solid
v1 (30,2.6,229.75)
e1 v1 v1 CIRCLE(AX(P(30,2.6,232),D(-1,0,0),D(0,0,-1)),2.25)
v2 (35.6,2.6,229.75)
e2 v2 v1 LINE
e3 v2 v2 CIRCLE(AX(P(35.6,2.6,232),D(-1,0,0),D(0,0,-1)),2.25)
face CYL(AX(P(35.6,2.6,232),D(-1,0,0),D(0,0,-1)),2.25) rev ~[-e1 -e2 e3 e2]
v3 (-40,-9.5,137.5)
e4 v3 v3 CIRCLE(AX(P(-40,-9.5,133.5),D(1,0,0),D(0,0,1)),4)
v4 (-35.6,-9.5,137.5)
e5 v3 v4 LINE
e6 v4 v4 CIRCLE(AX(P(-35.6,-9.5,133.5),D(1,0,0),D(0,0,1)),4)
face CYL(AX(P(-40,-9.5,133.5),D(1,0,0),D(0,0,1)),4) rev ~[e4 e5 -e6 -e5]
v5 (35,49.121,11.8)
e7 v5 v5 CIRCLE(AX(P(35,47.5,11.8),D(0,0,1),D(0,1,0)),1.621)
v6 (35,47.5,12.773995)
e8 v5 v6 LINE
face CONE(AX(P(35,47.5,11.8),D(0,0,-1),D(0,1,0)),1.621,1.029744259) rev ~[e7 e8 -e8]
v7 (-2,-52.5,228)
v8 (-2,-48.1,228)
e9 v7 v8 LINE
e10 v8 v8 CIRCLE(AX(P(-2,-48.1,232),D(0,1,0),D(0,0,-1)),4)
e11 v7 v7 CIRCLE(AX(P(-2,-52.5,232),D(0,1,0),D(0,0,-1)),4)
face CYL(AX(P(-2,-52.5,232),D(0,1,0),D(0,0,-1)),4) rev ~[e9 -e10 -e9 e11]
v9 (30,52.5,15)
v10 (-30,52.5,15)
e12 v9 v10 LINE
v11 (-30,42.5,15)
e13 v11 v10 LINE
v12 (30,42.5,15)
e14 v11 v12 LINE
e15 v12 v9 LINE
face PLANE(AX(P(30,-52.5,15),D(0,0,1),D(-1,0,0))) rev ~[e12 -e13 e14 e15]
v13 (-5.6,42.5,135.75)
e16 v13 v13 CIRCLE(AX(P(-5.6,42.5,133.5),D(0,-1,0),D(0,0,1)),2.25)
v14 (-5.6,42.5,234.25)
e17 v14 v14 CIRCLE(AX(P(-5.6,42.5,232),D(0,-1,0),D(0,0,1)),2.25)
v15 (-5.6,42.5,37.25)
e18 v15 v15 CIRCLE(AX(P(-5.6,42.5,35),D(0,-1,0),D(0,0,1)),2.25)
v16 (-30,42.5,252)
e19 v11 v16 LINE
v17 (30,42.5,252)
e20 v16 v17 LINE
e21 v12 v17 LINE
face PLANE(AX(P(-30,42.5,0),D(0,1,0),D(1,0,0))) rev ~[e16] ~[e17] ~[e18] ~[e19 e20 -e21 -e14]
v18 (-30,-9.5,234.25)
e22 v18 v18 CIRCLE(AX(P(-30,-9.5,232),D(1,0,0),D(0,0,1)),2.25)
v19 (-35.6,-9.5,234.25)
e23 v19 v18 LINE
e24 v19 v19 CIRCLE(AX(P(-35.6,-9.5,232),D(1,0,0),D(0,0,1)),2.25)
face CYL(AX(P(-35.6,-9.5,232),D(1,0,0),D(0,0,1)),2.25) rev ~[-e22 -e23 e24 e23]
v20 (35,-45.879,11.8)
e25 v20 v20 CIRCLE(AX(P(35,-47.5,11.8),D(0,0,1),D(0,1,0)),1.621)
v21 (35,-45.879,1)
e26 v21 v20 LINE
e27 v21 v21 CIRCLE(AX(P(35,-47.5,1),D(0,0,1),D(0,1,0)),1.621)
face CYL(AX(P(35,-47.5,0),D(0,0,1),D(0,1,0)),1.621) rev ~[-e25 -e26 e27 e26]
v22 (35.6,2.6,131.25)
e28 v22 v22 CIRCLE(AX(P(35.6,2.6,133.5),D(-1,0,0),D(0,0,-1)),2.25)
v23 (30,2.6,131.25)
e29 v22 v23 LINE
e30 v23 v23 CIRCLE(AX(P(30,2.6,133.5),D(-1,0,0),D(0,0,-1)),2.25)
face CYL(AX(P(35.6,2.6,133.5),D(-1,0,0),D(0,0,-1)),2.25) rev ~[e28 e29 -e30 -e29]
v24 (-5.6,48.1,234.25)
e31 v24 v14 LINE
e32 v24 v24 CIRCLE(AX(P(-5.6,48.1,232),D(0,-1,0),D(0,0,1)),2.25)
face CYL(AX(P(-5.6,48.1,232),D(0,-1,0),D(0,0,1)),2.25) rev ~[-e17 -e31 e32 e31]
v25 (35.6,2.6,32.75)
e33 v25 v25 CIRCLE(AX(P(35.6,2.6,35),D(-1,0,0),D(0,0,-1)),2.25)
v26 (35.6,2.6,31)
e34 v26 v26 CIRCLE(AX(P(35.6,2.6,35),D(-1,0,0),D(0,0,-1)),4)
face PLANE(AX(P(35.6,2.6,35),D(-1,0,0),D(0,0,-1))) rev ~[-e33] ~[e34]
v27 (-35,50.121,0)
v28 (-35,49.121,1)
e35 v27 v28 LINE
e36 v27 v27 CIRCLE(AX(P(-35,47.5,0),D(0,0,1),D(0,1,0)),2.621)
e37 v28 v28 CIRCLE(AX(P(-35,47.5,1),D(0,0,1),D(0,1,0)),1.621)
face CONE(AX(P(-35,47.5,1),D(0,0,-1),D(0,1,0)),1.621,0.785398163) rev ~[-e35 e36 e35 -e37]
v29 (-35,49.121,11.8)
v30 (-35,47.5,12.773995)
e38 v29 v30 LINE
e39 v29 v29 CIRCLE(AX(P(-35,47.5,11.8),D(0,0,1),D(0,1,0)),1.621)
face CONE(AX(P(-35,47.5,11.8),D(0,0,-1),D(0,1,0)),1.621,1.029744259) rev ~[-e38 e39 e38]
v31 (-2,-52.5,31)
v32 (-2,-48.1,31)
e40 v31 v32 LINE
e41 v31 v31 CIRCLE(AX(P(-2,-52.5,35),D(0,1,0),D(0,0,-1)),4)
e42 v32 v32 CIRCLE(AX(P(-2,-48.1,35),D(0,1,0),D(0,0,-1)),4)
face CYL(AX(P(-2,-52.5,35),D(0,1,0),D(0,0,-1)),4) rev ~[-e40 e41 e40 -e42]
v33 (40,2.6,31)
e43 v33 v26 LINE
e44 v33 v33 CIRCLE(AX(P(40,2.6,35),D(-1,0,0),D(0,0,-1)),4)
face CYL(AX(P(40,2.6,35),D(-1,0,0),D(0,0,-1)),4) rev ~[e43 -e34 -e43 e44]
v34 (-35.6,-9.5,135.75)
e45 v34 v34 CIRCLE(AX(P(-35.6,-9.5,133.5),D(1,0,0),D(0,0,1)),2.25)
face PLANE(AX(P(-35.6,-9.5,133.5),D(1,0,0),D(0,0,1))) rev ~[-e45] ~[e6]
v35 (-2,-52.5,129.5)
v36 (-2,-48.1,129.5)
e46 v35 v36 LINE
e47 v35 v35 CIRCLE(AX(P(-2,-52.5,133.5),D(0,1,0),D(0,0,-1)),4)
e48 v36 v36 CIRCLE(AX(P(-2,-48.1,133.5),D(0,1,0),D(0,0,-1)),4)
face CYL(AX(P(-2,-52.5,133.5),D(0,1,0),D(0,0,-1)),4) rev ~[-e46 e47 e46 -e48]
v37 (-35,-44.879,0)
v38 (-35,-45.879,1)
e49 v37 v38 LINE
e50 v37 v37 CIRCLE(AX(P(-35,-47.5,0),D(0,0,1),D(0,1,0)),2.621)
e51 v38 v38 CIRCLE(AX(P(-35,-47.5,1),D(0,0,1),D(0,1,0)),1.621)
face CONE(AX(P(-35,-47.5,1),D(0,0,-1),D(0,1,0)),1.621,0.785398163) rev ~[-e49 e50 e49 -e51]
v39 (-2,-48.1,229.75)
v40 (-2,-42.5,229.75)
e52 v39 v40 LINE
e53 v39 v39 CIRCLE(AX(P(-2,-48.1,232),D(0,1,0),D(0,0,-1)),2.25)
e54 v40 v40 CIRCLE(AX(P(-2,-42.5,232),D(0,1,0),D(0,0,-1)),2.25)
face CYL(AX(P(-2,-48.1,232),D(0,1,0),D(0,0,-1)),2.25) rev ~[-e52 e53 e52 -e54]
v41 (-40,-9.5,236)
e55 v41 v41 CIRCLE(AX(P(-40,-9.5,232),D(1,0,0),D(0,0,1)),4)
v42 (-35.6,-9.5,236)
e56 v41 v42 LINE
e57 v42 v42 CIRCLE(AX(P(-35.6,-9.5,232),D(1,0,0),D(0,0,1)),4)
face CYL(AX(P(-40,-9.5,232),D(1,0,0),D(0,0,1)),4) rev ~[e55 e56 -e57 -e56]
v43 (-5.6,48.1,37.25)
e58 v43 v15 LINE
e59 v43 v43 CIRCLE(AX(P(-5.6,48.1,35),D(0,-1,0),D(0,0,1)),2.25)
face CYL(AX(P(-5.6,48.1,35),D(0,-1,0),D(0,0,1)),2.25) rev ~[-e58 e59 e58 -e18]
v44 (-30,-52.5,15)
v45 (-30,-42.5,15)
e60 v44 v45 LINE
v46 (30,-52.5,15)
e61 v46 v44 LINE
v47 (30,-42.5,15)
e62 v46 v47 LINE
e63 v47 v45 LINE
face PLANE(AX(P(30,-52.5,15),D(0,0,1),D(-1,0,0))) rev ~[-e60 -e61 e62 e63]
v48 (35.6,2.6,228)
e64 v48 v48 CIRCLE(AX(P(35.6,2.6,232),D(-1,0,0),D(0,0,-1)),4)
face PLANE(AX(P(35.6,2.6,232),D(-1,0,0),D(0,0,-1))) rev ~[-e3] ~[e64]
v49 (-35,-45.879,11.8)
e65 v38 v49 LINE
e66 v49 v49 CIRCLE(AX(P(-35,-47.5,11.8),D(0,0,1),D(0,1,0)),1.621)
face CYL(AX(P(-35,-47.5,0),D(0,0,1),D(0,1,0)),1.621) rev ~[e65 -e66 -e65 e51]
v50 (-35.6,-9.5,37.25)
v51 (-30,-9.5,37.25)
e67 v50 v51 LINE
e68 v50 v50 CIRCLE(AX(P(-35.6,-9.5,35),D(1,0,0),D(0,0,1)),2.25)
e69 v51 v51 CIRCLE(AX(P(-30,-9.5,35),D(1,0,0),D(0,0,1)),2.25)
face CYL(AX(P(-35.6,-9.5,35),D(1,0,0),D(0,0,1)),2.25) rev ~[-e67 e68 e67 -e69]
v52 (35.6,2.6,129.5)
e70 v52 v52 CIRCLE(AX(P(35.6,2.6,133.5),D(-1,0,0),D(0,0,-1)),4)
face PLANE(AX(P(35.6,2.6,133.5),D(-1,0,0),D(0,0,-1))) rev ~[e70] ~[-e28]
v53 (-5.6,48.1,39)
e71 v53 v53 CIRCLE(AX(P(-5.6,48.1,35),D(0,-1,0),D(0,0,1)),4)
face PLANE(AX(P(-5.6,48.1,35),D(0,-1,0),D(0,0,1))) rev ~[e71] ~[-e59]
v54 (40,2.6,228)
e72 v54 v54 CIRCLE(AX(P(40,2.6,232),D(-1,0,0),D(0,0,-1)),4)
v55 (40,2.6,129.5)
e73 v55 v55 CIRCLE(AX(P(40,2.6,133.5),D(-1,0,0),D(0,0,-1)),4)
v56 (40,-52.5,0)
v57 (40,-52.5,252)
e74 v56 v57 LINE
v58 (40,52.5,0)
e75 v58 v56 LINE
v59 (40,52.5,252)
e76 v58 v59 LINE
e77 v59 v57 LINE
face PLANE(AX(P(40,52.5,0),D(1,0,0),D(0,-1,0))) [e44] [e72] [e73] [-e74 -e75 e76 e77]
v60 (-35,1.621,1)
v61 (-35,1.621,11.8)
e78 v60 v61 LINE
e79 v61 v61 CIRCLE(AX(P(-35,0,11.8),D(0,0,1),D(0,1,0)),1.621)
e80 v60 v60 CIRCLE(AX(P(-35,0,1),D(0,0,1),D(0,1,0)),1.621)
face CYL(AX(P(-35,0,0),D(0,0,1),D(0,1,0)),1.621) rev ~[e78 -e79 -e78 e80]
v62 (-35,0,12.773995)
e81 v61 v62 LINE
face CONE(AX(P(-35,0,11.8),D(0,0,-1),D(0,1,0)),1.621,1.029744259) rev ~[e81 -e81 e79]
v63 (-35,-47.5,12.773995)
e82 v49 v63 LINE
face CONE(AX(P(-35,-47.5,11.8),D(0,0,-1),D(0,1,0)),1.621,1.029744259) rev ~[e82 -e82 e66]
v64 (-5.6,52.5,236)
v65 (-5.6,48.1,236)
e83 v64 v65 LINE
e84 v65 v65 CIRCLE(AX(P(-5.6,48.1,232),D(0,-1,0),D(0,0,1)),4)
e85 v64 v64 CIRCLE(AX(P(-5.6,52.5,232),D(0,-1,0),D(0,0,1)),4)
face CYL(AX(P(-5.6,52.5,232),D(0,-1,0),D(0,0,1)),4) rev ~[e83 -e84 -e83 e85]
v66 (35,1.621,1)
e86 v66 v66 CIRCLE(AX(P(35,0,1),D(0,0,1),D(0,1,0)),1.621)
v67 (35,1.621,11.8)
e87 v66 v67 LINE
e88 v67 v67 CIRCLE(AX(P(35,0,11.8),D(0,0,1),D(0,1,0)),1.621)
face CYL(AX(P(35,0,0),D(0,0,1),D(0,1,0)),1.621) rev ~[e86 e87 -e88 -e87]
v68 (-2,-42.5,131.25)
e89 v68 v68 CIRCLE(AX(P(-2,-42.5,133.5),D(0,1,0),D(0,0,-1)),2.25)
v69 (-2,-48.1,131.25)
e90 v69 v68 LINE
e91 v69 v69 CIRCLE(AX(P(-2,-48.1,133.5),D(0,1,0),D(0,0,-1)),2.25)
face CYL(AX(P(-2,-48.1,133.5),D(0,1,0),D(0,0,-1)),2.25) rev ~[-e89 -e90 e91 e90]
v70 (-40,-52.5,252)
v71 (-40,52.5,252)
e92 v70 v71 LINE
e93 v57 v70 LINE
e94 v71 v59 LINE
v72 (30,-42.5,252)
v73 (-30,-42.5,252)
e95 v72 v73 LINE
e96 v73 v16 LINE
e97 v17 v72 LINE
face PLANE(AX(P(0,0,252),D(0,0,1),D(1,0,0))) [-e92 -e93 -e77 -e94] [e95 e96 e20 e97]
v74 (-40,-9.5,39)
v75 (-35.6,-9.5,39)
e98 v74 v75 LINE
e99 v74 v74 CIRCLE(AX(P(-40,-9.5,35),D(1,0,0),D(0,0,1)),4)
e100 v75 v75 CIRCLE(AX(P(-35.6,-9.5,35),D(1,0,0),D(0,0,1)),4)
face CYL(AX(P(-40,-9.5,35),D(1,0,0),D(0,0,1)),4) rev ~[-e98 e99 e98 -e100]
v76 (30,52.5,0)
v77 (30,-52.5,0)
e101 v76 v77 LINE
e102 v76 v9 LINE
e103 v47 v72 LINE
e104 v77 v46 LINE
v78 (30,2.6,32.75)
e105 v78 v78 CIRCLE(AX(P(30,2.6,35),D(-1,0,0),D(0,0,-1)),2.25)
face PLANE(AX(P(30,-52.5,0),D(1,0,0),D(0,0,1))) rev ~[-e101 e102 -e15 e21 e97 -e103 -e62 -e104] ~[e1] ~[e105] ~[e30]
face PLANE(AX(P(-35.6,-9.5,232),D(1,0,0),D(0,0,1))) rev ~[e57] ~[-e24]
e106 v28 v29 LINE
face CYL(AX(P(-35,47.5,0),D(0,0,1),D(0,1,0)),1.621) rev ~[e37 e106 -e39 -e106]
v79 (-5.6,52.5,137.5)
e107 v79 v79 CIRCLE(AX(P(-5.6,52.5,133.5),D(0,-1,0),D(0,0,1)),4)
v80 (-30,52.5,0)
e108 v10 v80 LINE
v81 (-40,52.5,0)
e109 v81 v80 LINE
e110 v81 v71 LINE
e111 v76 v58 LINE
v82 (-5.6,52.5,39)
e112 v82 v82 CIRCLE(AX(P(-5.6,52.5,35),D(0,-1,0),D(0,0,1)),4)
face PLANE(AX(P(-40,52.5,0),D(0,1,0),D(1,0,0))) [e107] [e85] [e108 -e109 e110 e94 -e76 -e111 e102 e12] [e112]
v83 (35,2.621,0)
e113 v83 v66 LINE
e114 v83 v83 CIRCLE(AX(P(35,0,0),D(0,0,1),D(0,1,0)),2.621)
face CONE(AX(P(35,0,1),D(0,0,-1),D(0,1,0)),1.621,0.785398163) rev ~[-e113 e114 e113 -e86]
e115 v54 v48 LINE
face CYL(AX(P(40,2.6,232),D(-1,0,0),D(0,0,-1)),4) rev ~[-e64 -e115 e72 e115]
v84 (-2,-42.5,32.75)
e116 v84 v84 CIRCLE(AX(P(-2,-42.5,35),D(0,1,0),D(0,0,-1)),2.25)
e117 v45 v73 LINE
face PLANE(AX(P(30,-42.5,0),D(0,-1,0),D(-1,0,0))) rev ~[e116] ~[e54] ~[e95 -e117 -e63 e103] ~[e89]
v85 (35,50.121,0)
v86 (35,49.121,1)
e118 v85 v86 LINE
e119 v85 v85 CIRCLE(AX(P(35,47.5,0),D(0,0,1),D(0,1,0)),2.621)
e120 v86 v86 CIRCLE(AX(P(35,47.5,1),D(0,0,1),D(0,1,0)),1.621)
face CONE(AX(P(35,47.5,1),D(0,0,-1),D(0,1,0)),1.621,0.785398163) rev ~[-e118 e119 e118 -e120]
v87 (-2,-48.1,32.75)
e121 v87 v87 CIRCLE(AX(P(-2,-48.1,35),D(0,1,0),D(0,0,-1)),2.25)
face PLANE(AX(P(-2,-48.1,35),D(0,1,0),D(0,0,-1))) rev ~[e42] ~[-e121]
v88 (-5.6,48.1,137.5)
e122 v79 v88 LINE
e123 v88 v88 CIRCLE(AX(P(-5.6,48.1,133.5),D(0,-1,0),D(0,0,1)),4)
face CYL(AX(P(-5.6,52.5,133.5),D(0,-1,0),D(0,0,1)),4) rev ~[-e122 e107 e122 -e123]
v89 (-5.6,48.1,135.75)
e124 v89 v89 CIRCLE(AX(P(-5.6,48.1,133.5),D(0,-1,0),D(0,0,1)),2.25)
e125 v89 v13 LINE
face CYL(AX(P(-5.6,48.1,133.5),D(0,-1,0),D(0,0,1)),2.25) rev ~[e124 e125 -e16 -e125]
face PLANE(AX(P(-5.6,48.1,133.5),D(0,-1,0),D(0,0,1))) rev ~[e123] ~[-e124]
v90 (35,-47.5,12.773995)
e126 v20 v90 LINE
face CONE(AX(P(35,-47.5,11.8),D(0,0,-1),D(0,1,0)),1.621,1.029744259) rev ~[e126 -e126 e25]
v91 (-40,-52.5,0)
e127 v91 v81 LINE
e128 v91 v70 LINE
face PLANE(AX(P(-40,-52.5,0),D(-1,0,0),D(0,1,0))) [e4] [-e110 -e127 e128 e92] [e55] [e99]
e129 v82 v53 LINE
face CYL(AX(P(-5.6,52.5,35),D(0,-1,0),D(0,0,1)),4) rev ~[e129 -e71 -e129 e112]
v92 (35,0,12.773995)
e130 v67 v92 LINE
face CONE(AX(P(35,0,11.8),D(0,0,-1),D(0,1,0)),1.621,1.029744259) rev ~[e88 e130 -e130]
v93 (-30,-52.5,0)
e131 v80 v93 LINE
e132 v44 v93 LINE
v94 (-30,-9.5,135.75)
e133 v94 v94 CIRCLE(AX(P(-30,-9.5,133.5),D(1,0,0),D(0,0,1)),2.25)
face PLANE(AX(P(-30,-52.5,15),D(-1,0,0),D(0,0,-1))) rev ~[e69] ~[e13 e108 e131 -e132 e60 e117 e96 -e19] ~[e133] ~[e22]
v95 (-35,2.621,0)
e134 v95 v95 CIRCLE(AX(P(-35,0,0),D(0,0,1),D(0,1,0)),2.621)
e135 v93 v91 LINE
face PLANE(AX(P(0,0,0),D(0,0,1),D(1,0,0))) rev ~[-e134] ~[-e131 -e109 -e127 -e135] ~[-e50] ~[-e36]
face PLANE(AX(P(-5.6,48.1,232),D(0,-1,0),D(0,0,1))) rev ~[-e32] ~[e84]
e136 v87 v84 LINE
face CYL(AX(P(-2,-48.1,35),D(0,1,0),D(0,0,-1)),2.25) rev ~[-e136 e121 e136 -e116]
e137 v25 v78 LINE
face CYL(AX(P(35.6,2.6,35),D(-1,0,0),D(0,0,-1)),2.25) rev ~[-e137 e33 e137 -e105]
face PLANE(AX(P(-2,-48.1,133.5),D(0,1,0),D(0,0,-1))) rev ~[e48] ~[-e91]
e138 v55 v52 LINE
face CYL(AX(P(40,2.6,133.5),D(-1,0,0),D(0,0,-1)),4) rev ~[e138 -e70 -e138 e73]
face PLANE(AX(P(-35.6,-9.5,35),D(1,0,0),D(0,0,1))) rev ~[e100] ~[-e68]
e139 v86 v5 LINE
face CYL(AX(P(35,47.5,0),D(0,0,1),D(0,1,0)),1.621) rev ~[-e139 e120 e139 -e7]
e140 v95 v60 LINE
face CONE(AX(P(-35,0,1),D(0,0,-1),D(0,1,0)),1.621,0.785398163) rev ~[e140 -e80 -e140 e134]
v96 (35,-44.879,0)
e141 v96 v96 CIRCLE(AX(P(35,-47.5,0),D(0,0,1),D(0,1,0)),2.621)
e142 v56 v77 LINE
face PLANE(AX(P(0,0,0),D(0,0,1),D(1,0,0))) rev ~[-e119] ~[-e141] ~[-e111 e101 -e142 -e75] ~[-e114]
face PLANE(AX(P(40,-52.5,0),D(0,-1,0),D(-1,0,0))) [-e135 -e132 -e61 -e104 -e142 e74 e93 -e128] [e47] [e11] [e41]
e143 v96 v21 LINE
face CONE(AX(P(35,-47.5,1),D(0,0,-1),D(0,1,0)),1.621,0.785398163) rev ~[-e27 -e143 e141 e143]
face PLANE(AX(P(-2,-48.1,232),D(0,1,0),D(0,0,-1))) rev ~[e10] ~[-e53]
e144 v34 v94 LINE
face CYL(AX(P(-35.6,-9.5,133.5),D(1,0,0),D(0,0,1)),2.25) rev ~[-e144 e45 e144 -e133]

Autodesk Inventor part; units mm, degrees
ref_plane "YZ Plane" through (0, 0, 0) normal (1, 0, 0) x (0, 1, 0)
ref_plane "XZ Plane" through (0, 0, 0) normal (0, 1, 0) x (-1, 0, 0)
ref_plane "XY Plane" through (0, 0, 0) normal (0, 0, 1) x (1, 0, 0)
sketch "Skizze1" plane through (0, 0, 0) normal (0, 0, 1) x (1, 0, 0)
  spline S0 degree 3 poles (4.1682, 35.1897) (1.1905, 36.4598) (-2.2497, 35.1642) (-6.2549, 34.1582) (-11.7361, 32.1479) (-17.2675, 27.437) (-17.3979, 22.2805) (-19.1794, 11.8373) (-24.2043, -4.2198) (-21.9122, -21.3618) (-15.7263, -32.1361) (-8.9601, -34.8731) (-7.7344, -35.2068) knots 0 0 0 0 0.05535 0.076528 0.211782 0.295547 0.382964 0.432922 0.754884 0.81234 0.967238 1 1 1 1
  spline S1 degree 3 poles (-7.7344, -35.2068) (-2.4391, -36.6482) (4.9342, -35.145) (14.3889, -31.3641) (20.2206, -28.2766) (23.0847, -23.1792) (23.281, -18.9959) (17.3062, -16.4997) (13.7398, -19.2937) (6.9074, -22.9332) (-1.1986, -27.1621) (-10.3055, -22.9326) (-14.0352, -10.4002) (-9.4599, -0.926) (-6.8333, 0.3153) (-5.9182, 2.0588) (-5.9367, 4.1791) (-8.2887, 5.2306) (-8.3641, 10.4373) (-1.0106, 14.1251) (4.0821, 20.0507) (3.0635, 26.3026) (2.9493, 28.6136) (3.7888, 29.834) (5.5778, 31.0924) (6.6132, 32.7745) (5.2458, 34.7086) (4.2657, 35.1481) (4.1682, 35.1897) knots 0 0 0 0 0.14153 0.17035 0.245987 0.25892 0.290227 0.326265 0.372233 0.38898 0.482096 0.508256 0.624416 0.647418 0.715274 0.72607 0.746892 0.801722 0.811885 0.848514 0.916356 0.943374 0.948219 0.962959 0.96651 0.98188 0.998188 1 1 1 1
  arc A0 (-7.9107, 24.207) -> (-7.9109, 20.407) centre (-6.0635, 22.307) ccw
  line L0 (-7.9107, 24.207) -> (-4.2161, 24.2069)
  arc A1 (-4.2163, 20.4069) -> (-4.2161, 24.2069) centre (-6.0635, 22.307) ccw
  line L1 (-4.2163, 20.4069) -> (-7.9109, 20.407)
  spline S2 degree 3 poles (4.1682, 35.1897) (1.1905, 36.4598) (-2.2497, 35.1642) (-6.255, 34.1582) (-11.7361, 32.1479) (-17.2675, 27.437) (-17.3979, 22.2805) (-19.1794, 11.8373) (-24.2043, -4.2198) (-21.9122, -21.3619) (-15.7263, -32.1361) (-8.9601, -34.8731) (-7.7344, -35.2068) knots 0 0 0 0 0.05535 0.076528 0.211782 0.295547 0.382964 0.432922 0.754884 0.81234 0.967238 1 1 1 1
  spline S3 degree 3 poles (-7.7344, -35.2068) (-2.4391, -36.6482) (4.9342, -35.145) (14.3889, -31.3641) (20.2206, -28.2766) (23.0847, -23.1792) (23.281, -18.9959) (17.3062, -16.4997) (13.7398, -19.2937) (6.9074, -22.9332) (-1.1986, -27.1621) (-10.3055, -22.9326) (-14.0352, -10.4002) (-9.4599, -0.926) (-6.8333, 0.3153) (-5.9182, 2.0588) (-5.9367, 4.1791) (-8.2887, 5.2306) (-8.3641, 10.4373) (-1.0106, 14.1251) (4.0821, 20.0507) (3.0635, 26.3026) (2.9493, 28.6136) (3.7888, 29.834) (5.5778, 31.0924) (6.6132, 32.7745) (5.2458, 34.7086) (4.2657, 35.1481) (4.1682, 35.1897) knots 0 0 0 0 0.14153 0.17035 0.245987 0.25892 0.290227 0.326265 0.372233 0.38898 0.482096 0.508256 0.624416 0.647418 0.715274 0.72607 0.746892 0.801722 0.811885 0.848514 0.916356 0.943374 0.948219 0.962959 0.96651 0.98188 0.998188 1 1 1 1
  line L2 (-4.2163, 20.4069) -> (-7.9109, 20.407)
  arc A2 (-4.2163, 20.4069) -> (-4.2161, 24.2069) centre (-6.0635, 22.307) ccw
  line L3 (-7.9107, 24.207) -> (-4.2161, 24.2069)
  arc A3 (-7.9107, 24.207) -> (-7.9109, 20.407) centre (-6.0635, 22.307) ccw
  line L4 (-22.9949, 35.8296) -> (22.9949, 35.8296) construction
  line L5 (22.9949, 35.8296) -> (22.9949, -35.8296) construction
  line L6 (22.9949, -35.8296) -> (-22.9949, -35.8296) construction
  line L7 (-22.9949, -35.8296) -> (-22.9949, 35.8296) construction
  line L8 (-22.9949, 35.8296) -> (22.9949, -35.8296) construction
  line L9 (-22.9949, -35.8296) -> (22.9949, 35.8296) construction
  point P0 (0, 0)
  point P1 (-38.8867, -20.8658)
  point P2 (0, 0)
sketch "Skizze2" plane through (0, 0, 0) normal (0, 0, 1) x (1, 0, 0)
  line L0 (-30, 42.5) -> (30, 42.5)
  line L1 (30, 42.5) -> (30, -42.5)
  line L2 (30, -42.5) -> (-30, -42.5)
  line L3 (-30, -42.5) -> (-30, 42.5)
  line L4 (-30, 42.5) -> (30, -42.5) construction
  line L5 (30, 42.5) -> (-30, -42.5) construction
  arc A0 (-7.9107, 24.207) -> (-7.9109, 20.407) centre (-6.0635, 22.307) ccw
  arc A1 (-7.9107, 24.207) -> (-7.9109, 20.407) centre (-6.0635, 22.307) ccw
  line L6 (-7.9107, 24.207) -> (-4.2161, 24.2069)
  line L7 (-7.9107, 24.207) -> (-4.2161, 24.2069)
  line L8 (-4.2163, 20.4069) -> (-7.9109, 20.407)
  line L9 (-4.2163, 20.4069) -> (-7.9109, 20.407)
  arc A2 (-4.2163, 20.4069) -> (-4.2161, 24.2069) centre (-6.0635, 22.307) ccw
  arc A3 (-4.2163, 20.4069) -> (-4.2161, 24.2069) centre (-6.0635, 22.307) ccw
  line L10 (-22.9949, 35.8296) -> (22.9949, 35.8296) construction
  line L11 (-22.9949, -35.8296) -> (-22.9949, 35.8296) construction
  spline S0 degree 3 poles (4.1682, 35.1897) (1.1905, 36.4598) (-2.2497, 35.1642) (-6.255, 34.1582) (-11.7361, 32.1479) (-17.2675, 27.437) (-17.3979, 22.2805) (-19.1794, 11.8373) (-24.2043, -4.2198) (-21.9122, -21.3619) (-15.7263, -32.1361) (-8.9601, -34.8731) (-7.7344, -35.2068) knots 0 0 0 0 0.05535 0.076528 0.211782 0.295547 0.382964 0.432922 0.754884 0.81234 0.967238 1 1 1 1
  spline S1 degree 3 poles (4.1682, 35.1897) (1.1905, 36.4598) (-2.2497, 35.1642) (-6.2549, 34.1582) (-11.7361, 32.1479) (-17.2675, 27.437) (-17.3979, 22.2805) (-19.1794, 11.8373) (-24.2043, -4.2198) (-21.9122, -21.3618) (-15.7263, -32.1361) (-8.9601, -34.8731) (-7.7344, -35.2068) knots 0 0 0 0 0.05535 0.076528 0.211782 0.295547 0.382964 0.432922 0.754884 0.81234 0.967238 1 1 1 1
  line L12 (-22.9949, 35.8296) -> (22.9949, -35.8296) construction
  line L13 (-22.9949, -35.8296) -> (22.9949, 35.8296) construction
  line L14 (22.9949, -35.8296) -> (-22.9949, -35.8296) construction
  spline S2 degree 3 poles (-7.7344, -35.2068) (-2.4391, -36.6482) (4.9342, -35.145) (14.3889, -31.3641) (20.2206, -28.2766) (23.0847, -23.1792) (23.281, -18.9959) (17.3062, -16.4997) (13.7398, -19.2937) (6.9074, -22.9332) (-1.1986, -27.1621) (-10.3055, -22.9326) (-14.0352, -10.4002) (-9.4599, -0.926) (-6.8333, 0.3153) (-5.9182, 2.0588) (-5.9367, 4.1791) (-8.2887, 5.2306) (-8.3641, 10.4373) (-1.0106, 14.1251) (4.0821, 20.0507) (3.0635, 26.3026) (2.9493, 28.6136) (3.7888, 29.834) (5.5778, 31.0924) (6.6132, 32.7745) (5.2458, 34.7086) (4.2657, 35.1481) (4.1682, 35.1897) knots 0 0 0 0 0.14153 0.17035 0.245987 0.25892 0.290227 0.326265 0.372233 0.38898 0.482096 0.508256 0.624416 0.647418 0.715274 0.72607 0.746892 0.801722 0.811885 0.848514 0.916356 0.943374 0.948219 0.962959 0.96651 0.98188 0.998188 1 1 1 1
  spline S3 degree 3 poles (-7.7344, -35.2068) (-2.4391, -36.6482) (4.9342, -35.145) (14.3889, -31.3641) (20.2206, -28.2766) (23.0847, -23.1792) (23.281, -18.9959) (17.3062, -16.4997) (13.7398, -19.2937) (6.9074, -22.9332) (-1.1986, -27.1621) (-10.3055, -22.9326) (-14.0352, -10.4002) (-9.4599, -0.926) (-6.8333, 0.3153) (-5.9182, 2.0588) (-5.9367, 4.1791) (-8.2887, 5.2306) (-8.3641, 10.4373) (-1.0106, 14.1251) (4.0821, 20.0507) (3.0635, 26.3026) (2.9493, 28.6136) (3.7888, 29.834) (5.5778, 31.0924) (6.6132, 32.7745) (5.2458, 34.7086) (4.2657, 35.1481) (4.1682, 35.1897) knots 0 0 0 0 0.14153 0.17035 0.245987 0.25892 0.290227 0.326265 0.372233 0.38898 0.482096 0.508256 0.624416 0.647418 0.715274 0.72607 0.746892 0.801722 0.811885 0.848514 0.916356 0.943374 0.948219 0.962959 0.96651 0.98188 0.998188 1 1 1 1
  line L15 (22.9949, 35.8296) -> (22.9949, -35.8296) construction
  line L16 (-40, 52.5) -> (40, 52.5)
  line L17 (40, 52.5) -> (40, -52.5)
  line L18 (40, -52.5) -> (-40, -52.5)
  line L19 (-40, -52.5) -> (-40, 52.5)
  line L20 (-40, 52.5) -> (40, -52.5) construction
  line L21 (40, 52.5) -> (-40, -52.5) construction
  point P0 (0, 0)
  point P1 (0, 0)
  point P2 (-38.8867, -20.8658)
  point P3 (0, 0)
  dimension "d0" = 45.9898
  dimension "d1" = 71.6591
  dimension "d2" = 60
  dimension "d3" = 85
  dimension "d4" = 80
  dimension "d5" = 105
extrude "Extrusion1" add sketch "Skizze2" along normal blind 252 contours L16 L17 L18 L19
sketch "Skizze3" plane through (-40, -52.5, 0) normal (0, -1, 0) x (1, 0, 0)
  line L0 (80, 0) -> (0, 0) projected
  line L1 (10, 0) -> (70, 0)
  line L2 (70, 0) -> (70, 15)
  line L3 (70, 15) -> (10, 15)
  line L4 (10, 15) -> (10, 0)
  line L5 (40, 15) -> (40, 0) construction
  point P0 (40, 0)
  point P1 (70, 0)
  dimension "d8" = 60
  dimension "d9" = 15
extrude "Extrusion2" cut sketch "Skizze3" against normal blind 105
sketch "Skizze4" plane through (0, 0, 0) normal (0, 0, -1) x (-1, 0, 0)
  point P0 (0, 0)
  point P1 (35, -47.5)
  dimension "d12" = 47.5
  dimension "d13" = 35
hole "Bohrung1" at (-35, -47.5, 0) direction (0, 0, 1) diameter 3.242 depth 11.8 tip angle 118 thread size "M4x0.7" class "6H" standard "ISO Metric profile"
chamfer "Fasen1" distance 1 angle 45 1 edges at (-35, -49.121, 0)
pattern_linear "Rechteckige Anordnung1" count 2 spacing 70 along (1, 0, 0) count 3 spacing 47.5 along (0, 1, 0) of "Bohrung1", "Fasen1"
sketch "Skizze5" plane through (40, -52.5, 0) normal (1, 0, 0) x (0, 0, -1)
  line L0 (0, 105) -> (-252, 105) projected
  line L1 (-252, 0) -> (-252, 105) projected
  line L2 (0, 0) -> (0, 105) projected
  line L3 (0, 0) -> (-252, 0) projected
  line L4 (-15, 95) -> (-252, 95) projected
  point P0 (0, 52.5)
  point P1 (-232, 55.1)
  point P2 (-133.5, 55.1)
  point P3 (-35, 55.1)
  point P4 (-252, 52.5)
  dimension "d31" = 20
  dimension "d32" = 118.5
  dimension "d33" = 35
  dimension "d42" = 39.9
hole "Bohrung2" at (40, 2.6, 232) at (40, 2.6, 133.5) at (40, 2.6, 35) direction (-1, 0, 0) diameter 4.5 depth 10 counterbore diameter 8 counterbore depth 4.4
sketch "Skizze6" plane through (-40, 52.5, 0) normal (0, 1, 0) x (1, 0, 0)
  line L0 (80, -129.5) -> (80, -137.5) projected
  line L1 (80, -228) -> (80, -236) projected
  line L2 (80, -31) -> (80, -39) projected
  line L3 (10, -15) -> (10, -252) projected
  point P0 (40, 0)
  point P1 (80, -232)
  point P2 (34.4, -232)
  point P3 (80, -133.5)
  point P4 (34.4, -133.5)
  point P5 (80, -35)
  point P6 (34.4, -35)
  dimension "d43" = 24.4
hole "Bohrung3" at (-5.6, 52.5, 232) at (-5.6, 52.5, 133.5) at (-5.6, 52.5, 35) direction (0, -1, 0) diameter 4.5 depth 10 tip angle 118 counterbore diameter 8 counterbore depth 4.4
sketch "Skizze7" plane through (-40, -52.5, 0) normal (-1, 0, 0) x (0, 0, 1)
  line L0 (228, 105) -> (236, 105) projected
  line L1 (129.5, 105) -> (137.5, 105) projected
  line L2 (31, 105) -> (39, 105) projected
  line L3 (15, 95) -> (252, 95) projected
  line L4 (15, 10) -> (252, 10) projected
  point P0 (0, 52.5)
  point P1 (232, 105)
  point P2 (232, 43)
  point P3 (133.5, 43)
  point P4 (35, 43)
  point P5 (133.5, 105)
  point P6 (35, 105)
  dimension "d67" = 33
hole "Bohrung4" at (-40, -9.5, 232) at (-40, -9.5, 133.5) at (-40, -9.5, 35) direction (1, 0, 0) diameter 4.5 depth 10 tip angle 118 counterbore diameter 8 counterbore depth 4.4
sketch "Skizze8" plane through (30, -52.5, 0) normal (0, -1, 0) x (1, 0, 0)
  circle A0 centre (-35.6, 232) radius 2.25 projected
  circle A1 centre (-35.6, 133.5) radius 2.25 projected
  circle A2 centre (-35.6, 35) radius 2.25 projected
  circle A3 centre (-35.6, 133.5) radius 4 projected
  line L0 (-60, 15) -> (-60, 252) projected
  point P0 (-30, 0)
  point P1 (-32, 232)
  point P2 (-32, 133.5)
  point P3 (-32, 35)
  point P4 (-34.5692, 20)
  point P5 (-36.6308, 20)
  dimension "d59" = 28
hole "Bohrung5" at (-2, -52.5, 35) at (-2, -52.5, 133.5) at (-2, -52.5, 232) direction (0, 1, 0) diameter 4.5 depth 10 tip angle 118 counterbore diameter 8 counterbore depth 4.4
equation "\"d2\" = Breite_innen"
equation "\"d3\" = Laenge_innen"
equation "\"d4\" = Breite_aussen"
equation "\"d5\" = Laenge_aussen"
equation "\"d6\" = Hoehe_Magazin"
equation "\"d8\" = Breite_innen"
equation "\"d9\" = Ausschubhoehe"
equation "\"d10\" = Laenge_aussen"
equation "\"d12\" = -0.5 * Wanddicke + 0.5 * Laenge_aussen"
equation "\"d13\" = -0.5 * Wanddicke + 0.5 * Breite_aussen"
equation "\"d26\" = Breite_aussen - Wanddicke"
equation "\"d29\" = -0.5 * Wanddicke + 0.5 * Laenge_aussen"
equation "\"d31\" = Abstand_Rand"
equation "\"d32\" = -0.5 * Ausschubhoehe + 0.5 * Hoehe_Magazin"
equation "\"d49\" = Wanddicke"
equation "\"d57\" = Wanddicke"
equation "\"d65\" = Wanddicke"
equation "\"Breite_innen\" = 60"
equation "\"Laenge_innen\" = 85"
equation "\"Breite_aussen\" = Breite_innen + 2 * Wanddicke"
equation "\"Laenge_aussen\" = Laenge_innen + 2 * Wanddicke"
equation "\"Wanddicke\" = 10"
equation "\"Absatz\" = 2"
equation "\"Abstand_Rand\" = 20"
equation "\"Hoehe_Magazin\" = 252"
equation "\"Ausschubhoehe\" = 15"
properties part number "TS_V1_Fallmagazin_Wandung_int_CPY"
